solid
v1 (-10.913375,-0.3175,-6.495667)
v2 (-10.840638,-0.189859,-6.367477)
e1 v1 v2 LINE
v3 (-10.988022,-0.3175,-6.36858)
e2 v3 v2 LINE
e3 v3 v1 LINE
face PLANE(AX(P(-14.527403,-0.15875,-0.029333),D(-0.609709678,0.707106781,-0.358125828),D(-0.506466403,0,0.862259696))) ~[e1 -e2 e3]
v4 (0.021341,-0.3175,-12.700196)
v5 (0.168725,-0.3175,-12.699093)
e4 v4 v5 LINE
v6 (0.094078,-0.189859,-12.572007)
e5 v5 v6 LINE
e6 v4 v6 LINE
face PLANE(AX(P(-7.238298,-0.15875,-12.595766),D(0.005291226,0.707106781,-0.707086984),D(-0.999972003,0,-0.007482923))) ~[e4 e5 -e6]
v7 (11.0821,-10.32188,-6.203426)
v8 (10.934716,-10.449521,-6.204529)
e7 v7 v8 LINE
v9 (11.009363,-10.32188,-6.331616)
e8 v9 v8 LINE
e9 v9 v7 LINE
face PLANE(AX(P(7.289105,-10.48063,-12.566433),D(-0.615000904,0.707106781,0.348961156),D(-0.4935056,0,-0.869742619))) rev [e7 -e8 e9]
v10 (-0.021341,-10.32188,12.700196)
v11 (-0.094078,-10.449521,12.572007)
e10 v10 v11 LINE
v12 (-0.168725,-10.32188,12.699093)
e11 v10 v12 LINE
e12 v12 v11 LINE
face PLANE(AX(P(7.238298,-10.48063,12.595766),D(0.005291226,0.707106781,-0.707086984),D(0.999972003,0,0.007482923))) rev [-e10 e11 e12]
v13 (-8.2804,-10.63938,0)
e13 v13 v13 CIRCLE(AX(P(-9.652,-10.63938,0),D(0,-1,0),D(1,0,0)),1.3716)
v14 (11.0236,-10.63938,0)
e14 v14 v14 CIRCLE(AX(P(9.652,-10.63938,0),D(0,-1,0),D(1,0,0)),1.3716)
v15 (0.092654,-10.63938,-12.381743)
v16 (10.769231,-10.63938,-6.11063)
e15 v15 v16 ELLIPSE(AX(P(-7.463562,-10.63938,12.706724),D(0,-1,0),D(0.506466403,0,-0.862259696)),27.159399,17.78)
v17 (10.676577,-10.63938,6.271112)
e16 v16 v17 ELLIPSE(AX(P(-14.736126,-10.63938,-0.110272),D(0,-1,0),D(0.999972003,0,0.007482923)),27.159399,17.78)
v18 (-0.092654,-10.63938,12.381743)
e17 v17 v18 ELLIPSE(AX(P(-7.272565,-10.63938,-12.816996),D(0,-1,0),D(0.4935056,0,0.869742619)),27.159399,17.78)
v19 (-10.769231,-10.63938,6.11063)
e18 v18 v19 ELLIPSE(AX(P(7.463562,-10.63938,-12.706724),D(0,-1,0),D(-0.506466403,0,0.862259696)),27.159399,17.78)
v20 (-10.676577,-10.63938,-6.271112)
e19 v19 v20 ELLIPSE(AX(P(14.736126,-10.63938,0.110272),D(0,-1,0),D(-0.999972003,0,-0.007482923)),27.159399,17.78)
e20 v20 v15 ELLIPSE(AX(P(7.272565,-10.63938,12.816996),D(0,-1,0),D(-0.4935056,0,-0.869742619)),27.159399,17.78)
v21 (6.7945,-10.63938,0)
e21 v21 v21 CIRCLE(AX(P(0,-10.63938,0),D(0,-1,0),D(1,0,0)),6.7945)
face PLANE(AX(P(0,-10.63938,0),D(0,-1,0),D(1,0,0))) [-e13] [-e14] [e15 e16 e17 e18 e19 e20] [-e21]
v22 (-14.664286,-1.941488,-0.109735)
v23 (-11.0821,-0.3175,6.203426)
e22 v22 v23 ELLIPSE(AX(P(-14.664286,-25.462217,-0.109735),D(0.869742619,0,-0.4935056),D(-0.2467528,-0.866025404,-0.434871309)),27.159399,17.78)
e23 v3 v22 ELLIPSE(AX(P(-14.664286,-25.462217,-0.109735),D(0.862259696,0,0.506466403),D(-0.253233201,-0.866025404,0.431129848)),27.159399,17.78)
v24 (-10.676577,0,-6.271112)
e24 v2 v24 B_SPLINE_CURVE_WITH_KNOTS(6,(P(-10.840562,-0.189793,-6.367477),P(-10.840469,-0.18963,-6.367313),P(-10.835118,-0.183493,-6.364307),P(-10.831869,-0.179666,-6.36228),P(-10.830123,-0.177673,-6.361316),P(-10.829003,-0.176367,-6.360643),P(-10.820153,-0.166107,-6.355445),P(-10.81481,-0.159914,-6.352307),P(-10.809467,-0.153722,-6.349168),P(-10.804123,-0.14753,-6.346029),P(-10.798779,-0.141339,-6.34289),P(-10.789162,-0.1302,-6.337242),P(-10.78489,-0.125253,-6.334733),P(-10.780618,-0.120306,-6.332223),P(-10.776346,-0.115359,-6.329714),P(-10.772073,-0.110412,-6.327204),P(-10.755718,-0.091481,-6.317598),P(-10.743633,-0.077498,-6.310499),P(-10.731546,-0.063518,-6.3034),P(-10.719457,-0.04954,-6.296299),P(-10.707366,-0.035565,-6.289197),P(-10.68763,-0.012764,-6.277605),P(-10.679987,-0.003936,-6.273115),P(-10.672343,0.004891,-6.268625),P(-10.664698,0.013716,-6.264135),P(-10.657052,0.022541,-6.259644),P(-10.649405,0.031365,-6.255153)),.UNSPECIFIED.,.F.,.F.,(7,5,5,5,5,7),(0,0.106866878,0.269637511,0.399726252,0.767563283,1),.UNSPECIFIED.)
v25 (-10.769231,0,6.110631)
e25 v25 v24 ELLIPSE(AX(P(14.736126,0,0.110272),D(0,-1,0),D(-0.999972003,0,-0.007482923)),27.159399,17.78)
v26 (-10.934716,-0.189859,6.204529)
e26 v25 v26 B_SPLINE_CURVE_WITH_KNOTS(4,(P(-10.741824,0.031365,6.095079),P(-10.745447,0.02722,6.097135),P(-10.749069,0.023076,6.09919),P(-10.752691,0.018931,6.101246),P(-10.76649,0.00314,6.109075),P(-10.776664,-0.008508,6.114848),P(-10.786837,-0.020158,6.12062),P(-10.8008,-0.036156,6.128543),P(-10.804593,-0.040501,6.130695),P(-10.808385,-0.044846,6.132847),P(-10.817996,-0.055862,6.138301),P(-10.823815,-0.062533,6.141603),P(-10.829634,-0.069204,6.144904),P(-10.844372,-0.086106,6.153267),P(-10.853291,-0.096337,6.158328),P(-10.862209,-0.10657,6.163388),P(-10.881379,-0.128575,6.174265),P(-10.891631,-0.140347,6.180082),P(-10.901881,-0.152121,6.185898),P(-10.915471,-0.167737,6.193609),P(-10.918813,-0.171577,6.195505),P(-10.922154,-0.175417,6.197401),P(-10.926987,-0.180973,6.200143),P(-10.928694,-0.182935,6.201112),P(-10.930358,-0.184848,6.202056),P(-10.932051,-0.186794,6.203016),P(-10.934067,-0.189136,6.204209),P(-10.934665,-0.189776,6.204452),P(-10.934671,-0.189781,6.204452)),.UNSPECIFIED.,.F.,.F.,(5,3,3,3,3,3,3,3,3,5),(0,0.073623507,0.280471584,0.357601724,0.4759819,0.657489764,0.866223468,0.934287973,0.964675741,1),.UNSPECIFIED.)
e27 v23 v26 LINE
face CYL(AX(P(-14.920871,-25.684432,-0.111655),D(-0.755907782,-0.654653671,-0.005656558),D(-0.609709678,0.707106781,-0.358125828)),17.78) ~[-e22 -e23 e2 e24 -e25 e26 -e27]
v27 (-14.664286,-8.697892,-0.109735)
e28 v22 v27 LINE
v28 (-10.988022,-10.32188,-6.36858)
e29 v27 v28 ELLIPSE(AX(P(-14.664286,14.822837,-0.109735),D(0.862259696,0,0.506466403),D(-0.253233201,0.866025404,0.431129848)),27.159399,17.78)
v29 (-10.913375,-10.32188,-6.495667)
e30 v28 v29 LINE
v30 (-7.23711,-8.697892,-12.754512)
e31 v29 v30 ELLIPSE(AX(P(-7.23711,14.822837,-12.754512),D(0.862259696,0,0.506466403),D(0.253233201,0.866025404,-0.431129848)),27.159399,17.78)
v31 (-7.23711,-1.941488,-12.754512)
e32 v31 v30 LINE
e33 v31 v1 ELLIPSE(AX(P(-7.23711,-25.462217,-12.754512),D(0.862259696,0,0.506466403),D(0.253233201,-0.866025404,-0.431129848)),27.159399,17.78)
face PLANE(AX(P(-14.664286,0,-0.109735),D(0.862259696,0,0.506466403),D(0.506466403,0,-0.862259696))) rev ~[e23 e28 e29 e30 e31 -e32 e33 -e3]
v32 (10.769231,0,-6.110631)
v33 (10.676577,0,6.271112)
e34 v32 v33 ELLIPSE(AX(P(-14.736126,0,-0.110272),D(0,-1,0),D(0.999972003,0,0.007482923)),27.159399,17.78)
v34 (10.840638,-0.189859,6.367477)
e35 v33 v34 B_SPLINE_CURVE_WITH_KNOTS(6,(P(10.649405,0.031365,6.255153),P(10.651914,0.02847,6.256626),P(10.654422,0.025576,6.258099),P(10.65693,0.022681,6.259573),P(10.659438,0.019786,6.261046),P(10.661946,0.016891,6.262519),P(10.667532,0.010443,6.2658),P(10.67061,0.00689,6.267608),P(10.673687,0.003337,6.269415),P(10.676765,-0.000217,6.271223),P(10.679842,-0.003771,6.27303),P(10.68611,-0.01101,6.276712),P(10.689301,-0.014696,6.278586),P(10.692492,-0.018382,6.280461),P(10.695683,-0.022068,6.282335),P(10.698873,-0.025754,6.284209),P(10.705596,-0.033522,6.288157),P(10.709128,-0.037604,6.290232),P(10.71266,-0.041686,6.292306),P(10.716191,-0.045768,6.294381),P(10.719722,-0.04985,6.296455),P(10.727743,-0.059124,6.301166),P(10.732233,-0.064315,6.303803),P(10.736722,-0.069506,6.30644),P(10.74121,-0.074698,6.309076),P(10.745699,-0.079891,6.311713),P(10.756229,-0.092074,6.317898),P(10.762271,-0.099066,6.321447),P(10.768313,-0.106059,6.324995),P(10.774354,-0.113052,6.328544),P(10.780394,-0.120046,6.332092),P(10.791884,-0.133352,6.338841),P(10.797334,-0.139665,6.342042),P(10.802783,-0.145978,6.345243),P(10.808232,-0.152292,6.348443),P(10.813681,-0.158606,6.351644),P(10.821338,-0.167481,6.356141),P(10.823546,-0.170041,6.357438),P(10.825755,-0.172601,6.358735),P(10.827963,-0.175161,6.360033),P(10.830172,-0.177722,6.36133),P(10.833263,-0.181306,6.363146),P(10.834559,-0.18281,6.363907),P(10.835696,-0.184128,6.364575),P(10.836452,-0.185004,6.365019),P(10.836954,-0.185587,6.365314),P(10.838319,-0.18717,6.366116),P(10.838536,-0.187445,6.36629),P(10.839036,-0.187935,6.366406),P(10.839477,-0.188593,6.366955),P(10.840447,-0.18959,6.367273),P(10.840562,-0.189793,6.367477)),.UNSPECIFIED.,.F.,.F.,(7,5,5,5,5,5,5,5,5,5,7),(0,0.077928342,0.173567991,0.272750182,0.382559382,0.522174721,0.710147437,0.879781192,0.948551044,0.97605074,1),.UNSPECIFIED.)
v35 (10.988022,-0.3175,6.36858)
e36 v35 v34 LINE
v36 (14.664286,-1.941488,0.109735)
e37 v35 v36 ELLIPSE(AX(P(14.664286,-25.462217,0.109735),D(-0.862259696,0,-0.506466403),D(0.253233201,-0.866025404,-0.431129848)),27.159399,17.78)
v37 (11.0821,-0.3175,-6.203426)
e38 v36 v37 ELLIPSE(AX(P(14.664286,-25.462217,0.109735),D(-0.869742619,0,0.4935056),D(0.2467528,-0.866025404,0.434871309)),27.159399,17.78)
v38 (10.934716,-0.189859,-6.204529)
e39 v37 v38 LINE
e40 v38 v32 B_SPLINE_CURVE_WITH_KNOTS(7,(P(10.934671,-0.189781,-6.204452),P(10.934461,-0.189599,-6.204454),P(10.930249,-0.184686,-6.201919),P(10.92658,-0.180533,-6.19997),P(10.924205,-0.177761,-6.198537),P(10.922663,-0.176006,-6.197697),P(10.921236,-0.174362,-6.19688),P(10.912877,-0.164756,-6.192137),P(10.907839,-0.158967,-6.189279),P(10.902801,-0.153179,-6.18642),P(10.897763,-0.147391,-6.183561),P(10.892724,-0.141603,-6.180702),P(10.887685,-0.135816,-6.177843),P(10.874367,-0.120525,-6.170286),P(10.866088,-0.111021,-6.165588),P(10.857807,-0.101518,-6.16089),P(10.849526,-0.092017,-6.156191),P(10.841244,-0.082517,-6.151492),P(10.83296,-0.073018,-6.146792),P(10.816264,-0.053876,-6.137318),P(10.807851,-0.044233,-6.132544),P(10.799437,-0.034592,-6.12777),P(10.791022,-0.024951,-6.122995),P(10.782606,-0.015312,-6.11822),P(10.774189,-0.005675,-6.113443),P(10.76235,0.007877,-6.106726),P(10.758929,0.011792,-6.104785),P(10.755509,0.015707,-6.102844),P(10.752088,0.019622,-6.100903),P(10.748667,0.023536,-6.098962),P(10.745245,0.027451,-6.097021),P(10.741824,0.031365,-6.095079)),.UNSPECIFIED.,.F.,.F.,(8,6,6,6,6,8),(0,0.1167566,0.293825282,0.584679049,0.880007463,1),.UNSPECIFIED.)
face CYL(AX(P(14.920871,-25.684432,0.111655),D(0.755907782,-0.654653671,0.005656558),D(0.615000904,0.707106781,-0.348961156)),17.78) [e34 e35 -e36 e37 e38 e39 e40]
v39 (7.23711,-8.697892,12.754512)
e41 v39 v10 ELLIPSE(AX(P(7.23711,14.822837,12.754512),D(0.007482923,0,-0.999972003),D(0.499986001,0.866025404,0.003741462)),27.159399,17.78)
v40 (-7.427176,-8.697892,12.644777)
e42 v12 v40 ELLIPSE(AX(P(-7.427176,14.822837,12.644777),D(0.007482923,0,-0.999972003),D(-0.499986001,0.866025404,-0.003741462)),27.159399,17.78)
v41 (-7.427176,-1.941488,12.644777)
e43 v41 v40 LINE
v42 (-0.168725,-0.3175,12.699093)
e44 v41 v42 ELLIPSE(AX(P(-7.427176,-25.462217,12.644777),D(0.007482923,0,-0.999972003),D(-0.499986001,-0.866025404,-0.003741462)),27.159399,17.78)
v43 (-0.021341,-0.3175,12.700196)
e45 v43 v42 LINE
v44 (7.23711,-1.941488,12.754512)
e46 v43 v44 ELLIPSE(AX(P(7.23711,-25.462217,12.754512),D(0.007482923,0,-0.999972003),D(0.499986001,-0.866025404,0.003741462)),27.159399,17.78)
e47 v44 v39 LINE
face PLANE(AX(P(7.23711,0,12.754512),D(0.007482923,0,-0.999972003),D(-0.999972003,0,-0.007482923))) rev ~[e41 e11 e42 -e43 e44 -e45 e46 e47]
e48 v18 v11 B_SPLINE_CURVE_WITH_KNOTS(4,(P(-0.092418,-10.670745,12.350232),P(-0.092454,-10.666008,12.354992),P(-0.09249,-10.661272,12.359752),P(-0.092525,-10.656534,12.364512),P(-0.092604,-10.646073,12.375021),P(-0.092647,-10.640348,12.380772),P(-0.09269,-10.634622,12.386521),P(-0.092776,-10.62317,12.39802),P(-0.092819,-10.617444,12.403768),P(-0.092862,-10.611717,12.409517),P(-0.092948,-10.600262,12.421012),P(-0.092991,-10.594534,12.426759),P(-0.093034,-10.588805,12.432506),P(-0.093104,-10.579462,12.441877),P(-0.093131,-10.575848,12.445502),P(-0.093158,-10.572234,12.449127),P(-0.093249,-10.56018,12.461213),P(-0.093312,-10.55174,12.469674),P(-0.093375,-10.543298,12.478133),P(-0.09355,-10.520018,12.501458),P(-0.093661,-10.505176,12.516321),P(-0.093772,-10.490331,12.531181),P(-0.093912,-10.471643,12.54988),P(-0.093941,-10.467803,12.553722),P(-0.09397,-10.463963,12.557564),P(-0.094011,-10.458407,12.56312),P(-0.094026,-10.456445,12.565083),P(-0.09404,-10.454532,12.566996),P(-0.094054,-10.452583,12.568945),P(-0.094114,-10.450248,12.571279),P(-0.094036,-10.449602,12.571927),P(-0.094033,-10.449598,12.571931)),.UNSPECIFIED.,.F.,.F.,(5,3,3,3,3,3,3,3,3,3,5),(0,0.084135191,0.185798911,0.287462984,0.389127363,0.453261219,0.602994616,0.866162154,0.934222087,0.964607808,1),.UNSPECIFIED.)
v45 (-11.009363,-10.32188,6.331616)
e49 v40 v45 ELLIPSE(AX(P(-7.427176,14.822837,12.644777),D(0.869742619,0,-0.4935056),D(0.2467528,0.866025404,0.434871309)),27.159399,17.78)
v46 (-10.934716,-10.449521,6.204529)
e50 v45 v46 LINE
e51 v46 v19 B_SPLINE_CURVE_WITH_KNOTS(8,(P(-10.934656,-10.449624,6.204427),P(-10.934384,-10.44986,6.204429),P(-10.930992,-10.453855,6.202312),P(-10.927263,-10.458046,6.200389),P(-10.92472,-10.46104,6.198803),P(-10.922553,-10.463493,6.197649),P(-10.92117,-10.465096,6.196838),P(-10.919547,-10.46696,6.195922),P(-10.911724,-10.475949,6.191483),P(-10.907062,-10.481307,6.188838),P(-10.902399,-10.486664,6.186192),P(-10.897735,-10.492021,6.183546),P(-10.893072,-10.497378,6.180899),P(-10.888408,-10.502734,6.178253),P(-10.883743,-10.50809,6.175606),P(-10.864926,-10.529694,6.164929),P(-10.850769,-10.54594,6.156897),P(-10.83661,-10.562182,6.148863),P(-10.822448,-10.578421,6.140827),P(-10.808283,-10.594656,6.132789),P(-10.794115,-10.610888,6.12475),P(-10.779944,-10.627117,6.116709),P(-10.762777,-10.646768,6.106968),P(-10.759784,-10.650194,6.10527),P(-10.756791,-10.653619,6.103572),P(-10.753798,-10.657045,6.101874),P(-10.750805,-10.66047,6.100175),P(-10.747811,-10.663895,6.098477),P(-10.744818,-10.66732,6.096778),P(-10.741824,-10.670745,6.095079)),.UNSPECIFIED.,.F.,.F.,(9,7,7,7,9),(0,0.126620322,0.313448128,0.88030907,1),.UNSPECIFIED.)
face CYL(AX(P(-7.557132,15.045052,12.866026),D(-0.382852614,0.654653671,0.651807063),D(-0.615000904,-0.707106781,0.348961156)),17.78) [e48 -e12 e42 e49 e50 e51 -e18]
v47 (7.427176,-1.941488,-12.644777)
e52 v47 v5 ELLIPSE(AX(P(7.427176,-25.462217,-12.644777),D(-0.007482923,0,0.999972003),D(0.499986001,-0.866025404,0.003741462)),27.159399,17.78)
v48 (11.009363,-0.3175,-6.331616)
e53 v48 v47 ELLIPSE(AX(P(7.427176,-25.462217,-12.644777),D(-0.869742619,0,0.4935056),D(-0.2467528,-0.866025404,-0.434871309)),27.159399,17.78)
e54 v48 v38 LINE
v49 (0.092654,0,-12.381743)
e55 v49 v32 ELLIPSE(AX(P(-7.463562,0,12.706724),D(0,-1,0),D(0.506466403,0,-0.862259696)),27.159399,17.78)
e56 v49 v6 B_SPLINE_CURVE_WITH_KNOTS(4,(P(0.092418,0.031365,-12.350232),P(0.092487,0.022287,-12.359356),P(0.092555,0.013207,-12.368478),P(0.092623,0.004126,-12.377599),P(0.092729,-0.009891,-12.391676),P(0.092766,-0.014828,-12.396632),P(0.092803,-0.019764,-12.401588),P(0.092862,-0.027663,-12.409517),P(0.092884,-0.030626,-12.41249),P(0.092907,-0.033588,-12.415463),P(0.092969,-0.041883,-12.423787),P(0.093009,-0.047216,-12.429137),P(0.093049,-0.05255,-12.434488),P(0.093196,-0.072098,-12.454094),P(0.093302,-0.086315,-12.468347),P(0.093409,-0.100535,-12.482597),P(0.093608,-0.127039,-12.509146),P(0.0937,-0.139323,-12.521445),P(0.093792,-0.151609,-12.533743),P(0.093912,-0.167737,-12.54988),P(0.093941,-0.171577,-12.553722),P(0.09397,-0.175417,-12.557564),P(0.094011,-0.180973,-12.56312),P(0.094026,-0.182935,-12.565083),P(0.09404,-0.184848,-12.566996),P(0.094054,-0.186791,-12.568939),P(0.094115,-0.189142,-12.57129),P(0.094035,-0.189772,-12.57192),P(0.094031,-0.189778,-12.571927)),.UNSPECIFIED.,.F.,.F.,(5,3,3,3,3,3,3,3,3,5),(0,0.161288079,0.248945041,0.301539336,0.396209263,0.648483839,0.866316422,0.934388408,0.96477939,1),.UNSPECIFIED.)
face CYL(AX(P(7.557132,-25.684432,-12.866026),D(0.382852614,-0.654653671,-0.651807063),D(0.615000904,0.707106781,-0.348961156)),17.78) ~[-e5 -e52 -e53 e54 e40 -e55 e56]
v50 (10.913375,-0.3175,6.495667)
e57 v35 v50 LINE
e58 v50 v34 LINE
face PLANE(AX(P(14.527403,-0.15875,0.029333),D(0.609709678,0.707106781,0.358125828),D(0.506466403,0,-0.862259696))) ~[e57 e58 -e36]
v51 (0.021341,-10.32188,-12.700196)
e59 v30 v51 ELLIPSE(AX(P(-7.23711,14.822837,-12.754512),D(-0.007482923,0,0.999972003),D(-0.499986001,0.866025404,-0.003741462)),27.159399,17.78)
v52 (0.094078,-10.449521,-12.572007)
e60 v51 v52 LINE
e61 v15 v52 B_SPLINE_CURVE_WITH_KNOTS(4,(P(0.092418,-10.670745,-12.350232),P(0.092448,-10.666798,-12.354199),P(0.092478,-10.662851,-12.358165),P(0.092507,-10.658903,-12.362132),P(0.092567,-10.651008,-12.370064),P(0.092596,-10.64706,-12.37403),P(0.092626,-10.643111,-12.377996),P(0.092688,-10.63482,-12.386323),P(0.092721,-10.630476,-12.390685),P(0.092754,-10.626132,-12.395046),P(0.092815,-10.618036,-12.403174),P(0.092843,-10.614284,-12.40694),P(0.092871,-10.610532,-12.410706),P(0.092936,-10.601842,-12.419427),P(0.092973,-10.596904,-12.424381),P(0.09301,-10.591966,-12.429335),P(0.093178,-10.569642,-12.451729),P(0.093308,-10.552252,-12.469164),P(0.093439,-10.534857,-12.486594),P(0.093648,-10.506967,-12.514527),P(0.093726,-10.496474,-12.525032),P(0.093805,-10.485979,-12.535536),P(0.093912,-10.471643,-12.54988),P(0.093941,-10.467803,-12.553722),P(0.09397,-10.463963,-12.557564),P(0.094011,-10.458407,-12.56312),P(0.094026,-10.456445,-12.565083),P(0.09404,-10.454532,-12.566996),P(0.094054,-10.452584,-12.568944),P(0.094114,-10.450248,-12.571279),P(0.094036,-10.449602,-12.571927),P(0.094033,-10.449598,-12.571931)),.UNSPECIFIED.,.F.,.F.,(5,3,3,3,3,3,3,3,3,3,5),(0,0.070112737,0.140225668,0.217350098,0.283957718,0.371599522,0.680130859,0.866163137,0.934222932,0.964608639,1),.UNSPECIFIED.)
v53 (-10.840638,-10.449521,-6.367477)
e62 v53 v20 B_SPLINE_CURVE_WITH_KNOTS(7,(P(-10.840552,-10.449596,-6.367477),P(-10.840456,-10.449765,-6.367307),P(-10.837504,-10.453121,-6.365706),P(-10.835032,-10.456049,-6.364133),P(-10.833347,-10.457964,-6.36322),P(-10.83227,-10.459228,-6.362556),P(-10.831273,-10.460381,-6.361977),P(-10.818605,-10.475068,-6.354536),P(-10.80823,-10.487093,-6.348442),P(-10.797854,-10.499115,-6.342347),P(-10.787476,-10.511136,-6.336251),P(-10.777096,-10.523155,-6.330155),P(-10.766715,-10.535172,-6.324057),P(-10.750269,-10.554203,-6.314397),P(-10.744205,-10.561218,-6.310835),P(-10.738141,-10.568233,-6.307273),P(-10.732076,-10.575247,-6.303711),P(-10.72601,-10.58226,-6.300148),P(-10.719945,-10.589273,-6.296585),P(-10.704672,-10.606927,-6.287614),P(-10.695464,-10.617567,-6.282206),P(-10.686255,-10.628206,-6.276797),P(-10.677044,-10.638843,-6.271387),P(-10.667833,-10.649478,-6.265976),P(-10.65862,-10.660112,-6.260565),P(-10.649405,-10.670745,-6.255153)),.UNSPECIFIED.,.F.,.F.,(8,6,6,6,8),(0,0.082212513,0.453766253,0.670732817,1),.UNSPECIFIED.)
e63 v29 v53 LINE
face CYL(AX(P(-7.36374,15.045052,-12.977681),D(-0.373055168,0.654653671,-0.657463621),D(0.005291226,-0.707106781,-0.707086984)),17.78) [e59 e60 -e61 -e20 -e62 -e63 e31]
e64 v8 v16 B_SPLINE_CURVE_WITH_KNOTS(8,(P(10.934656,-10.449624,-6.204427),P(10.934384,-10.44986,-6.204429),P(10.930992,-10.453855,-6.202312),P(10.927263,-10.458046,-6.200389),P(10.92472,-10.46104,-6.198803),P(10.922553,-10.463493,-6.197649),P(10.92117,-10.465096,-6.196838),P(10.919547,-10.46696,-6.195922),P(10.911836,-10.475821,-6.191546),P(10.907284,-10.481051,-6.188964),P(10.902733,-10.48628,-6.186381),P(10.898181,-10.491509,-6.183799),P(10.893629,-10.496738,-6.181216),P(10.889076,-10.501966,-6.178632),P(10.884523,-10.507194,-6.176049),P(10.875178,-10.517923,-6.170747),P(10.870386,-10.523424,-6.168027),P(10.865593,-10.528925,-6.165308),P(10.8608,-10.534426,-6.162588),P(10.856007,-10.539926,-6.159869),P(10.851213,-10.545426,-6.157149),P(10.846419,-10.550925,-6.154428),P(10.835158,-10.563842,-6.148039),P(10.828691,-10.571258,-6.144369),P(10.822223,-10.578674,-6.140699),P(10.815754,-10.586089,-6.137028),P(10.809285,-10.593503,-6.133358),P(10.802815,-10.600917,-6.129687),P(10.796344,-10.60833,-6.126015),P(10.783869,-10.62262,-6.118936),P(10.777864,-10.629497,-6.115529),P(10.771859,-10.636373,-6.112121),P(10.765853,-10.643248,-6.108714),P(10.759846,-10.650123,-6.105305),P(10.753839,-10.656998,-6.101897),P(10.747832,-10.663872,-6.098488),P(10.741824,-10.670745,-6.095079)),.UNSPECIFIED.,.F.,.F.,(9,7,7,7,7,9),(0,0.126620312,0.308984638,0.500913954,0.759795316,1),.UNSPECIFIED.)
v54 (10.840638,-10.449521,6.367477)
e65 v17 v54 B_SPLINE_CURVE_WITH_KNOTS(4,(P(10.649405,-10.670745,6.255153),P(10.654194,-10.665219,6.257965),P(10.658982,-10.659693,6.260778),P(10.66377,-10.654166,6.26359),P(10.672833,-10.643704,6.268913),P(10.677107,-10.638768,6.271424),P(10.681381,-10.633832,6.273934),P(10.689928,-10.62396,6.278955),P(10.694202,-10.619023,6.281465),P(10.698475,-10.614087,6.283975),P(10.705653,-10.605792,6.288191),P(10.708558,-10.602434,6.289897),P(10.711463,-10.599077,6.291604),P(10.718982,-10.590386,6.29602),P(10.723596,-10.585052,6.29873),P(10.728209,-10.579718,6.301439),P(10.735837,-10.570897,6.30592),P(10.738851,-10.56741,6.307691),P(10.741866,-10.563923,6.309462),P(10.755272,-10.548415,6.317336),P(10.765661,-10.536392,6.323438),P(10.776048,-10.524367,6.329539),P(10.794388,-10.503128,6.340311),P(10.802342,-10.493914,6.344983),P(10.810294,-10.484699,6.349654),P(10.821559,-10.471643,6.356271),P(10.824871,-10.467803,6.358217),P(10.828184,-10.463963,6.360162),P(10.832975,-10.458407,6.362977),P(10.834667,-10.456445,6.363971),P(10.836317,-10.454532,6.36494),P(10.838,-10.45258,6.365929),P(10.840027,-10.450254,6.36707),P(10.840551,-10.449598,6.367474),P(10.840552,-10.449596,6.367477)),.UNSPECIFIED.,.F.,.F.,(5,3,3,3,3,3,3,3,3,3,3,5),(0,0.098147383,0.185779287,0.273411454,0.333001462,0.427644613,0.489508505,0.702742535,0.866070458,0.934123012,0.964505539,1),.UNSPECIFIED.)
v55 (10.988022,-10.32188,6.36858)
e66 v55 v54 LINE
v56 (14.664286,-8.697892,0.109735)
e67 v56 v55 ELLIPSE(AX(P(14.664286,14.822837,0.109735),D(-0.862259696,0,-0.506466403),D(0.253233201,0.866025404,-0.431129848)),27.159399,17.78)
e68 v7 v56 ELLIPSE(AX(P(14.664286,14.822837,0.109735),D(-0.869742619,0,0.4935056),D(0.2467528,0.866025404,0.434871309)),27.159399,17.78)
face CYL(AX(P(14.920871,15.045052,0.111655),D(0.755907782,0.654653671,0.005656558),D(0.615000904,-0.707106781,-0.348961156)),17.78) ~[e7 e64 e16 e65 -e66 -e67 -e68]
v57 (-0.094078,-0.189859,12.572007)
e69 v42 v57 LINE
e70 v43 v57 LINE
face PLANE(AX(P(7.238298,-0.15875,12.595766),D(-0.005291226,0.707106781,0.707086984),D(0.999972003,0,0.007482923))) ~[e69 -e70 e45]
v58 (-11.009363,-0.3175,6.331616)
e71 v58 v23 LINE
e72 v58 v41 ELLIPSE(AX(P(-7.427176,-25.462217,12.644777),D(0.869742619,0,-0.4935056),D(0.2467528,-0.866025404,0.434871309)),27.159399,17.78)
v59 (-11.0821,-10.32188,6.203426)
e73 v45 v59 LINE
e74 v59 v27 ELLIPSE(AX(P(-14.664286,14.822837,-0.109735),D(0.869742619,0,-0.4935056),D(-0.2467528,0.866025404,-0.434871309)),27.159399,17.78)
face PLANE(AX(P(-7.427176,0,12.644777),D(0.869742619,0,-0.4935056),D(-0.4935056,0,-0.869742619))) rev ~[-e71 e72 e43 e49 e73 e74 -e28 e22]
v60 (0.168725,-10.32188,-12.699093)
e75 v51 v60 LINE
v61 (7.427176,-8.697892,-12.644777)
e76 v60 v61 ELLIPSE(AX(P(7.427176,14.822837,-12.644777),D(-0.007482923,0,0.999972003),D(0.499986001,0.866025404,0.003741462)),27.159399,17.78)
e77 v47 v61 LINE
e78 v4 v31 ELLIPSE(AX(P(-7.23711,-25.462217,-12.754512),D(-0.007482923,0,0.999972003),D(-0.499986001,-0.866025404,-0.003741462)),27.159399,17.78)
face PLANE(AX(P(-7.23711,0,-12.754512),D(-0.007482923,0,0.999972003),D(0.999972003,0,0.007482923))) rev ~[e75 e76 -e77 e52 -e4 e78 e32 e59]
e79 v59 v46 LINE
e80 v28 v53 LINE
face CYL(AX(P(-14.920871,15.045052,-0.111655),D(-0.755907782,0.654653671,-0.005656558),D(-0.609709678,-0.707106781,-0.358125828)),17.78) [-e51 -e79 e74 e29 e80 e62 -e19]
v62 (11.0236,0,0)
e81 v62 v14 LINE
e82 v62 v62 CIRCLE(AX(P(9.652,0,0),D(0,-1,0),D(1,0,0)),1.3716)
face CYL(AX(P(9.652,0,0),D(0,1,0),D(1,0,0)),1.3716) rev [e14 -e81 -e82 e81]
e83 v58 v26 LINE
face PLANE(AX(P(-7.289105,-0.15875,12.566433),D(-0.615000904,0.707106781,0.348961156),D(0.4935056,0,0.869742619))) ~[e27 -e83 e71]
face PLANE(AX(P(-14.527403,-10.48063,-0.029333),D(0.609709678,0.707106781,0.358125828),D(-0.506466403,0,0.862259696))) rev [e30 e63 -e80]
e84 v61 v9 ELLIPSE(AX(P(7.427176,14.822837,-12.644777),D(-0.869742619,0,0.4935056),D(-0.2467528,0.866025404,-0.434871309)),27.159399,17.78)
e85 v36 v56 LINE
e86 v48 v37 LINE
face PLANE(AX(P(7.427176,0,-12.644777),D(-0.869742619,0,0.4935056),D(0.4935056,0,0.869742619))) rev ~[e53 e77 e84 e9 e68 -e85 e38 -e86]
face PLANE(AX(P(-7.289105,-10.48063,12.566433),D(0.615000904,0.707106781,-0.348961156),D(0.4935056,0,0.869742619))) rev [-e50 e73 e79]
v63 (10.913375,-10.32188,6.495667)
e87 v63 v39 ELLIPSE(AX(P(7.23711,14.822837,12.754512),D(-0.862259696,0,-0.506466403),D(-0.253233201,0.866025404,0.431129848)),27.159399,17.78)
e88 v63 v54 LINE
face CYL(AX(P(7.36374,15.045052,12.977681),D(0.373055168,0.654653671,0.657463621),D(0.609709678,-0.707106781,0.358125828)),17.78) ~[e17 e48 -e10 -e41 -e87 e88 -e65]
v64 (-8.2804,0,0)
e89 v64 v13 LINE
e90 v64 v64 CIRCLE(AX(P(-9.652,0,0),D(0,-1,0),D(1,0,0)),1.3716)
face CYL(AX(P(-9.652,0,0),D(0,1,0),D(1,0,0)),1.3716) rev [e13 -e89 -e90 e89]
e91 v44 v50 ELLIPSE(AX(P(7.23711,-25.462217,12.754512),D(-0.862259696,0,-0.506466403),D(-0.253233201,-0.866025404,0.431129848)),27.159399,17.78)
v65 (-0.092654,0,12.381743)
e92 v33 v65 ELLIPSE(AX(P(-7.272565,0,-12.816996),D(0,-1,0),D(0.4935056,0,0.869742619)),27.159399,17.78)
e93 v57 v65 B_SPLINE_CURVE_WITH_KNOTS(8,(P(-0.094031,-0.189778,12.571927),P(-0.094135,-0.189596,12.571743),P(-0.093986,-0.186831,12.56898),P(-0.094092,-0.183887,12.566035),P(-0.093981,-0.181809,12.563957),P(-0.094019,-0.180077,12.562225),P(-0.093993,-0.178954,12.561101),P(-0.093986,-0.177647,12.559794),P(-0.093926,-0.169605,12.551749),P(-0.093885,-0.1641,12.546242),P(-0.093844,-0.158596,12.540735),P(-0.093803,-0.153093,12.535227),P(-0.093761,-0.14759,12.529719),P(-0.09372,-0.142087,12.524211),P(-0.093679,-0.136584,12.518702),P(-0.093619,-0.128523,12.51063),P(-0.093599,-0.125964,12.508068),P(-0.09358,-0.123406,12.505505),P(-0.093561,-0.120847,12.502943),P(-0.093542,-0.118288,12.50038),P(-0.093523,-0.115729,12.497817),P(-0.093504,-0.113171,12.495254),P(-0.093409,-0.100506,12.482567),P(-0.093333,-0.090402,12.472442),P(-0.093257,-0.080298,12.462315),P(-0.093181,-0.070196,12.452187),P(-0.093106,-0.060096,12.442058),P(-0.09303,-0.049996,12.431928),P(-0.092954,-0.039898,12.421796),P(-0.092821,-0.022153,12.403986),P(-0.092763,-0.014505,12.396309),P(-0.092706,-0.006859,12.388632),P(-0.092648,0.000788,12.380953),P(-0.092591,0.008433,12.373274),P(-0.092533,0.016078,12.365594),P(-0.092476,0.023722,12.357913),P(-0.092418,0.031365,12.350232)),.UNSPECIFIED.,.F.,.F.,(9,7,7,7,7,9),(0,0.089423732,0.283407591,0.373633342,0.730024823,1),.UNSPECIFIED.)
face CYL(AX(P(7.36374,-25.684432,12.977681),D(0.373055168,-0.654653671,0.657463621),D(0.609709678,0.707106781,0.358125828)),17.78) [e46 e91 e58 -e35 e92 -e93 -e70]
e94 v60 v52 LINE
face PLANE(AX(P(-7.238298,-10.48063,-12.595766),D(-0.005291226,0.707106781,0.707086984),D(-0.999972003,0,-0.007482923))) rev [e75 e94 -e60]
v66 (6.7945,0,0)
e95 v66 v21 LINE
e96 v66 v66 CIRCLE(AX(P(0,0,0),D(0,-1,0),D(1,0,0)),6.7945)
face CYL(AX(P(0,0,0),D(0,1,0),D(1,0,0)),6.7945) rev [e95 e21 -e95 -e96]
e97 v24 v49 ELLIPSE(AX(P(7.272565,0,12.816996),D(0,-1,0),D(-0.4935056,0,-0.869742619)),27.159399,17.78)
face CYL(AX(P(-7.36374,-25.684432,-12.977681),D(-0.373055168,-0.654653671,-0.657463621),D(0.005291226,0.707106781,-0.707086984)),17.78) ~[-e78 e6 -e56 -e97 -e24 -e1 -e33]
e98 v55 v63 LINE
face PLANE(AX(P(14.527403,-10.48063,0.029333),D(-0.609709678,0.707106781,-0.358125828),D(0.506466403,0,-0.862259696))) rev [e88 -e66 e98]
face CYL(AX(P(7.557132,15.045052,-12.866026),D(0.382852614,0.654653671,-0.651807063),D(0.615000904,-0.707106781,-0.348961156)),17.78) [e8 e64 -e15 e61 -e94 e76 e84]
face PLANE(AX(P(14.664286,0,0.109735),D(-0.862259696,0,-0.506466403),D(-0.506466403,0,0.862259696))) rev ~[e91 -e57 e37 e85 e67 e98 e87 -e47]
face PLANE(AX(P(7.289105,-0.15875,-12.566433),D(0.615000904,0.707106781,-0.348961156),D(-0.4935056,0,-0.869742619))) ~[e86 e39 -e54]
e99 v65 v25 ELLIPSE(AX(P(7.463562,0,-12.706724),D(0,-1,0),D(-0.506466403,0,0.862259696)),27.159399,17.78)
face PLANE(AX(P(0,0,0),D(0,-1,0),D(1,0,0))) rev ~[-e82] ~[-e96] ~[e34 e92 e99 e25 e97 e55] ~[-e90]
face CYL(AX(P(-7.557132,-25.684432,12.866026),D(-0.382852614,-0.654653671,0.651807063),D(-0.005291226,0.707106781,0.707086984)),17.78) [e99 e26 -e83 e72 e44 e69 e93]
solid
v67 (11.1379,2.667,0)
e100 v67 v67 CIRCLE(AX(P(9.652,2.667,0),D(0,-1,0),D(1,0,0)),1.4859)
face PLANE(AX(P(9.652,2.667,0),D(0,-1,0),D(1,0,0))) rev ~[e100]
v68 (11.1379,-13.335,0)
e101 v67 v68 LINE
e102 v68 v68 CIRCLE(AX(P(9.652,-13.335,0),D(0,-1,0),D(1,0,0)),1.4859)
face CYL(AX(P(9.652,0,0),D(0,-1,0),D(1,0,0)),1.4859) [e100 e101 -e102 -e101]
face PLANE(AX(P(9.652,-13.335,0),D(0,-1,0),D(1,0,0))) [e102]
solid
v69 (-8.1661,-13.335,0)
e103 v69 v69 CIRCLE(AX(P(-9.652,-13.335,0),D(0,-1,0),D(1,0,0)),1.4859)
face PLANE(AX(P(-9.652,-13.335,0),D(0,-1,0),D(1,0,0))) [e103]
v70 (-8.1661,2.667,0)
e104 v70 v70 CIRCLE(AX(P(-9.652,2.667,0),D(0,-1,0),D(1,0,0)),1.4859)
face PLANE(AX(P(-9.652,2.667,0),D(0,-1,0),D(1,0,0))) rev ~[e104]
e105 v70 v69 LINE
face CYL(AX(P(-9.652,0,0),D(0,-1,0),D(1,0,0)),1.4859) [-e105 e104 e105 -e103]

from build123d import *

# Parameters (mm, degrees)
F0_R          = 1.3716
F0_R_2        = 6.7945
F1_DEPTH      = 10.63938
F2_R          = 1.4859
F3_DEPTH      = 13.335
F3_DEPTH_BACK = 2.667
F4_SIZE2      = 0.3175
F4_SIZE       = 0.3175
F5_T1_DEPTH   = 34.0860309116
F5_T3_DEPTH   = 34.0860309116
F5_T5_DEPTH   = 34.0860309116
F5_T7_DEPTH   = 34.0860309116
F5_T9_DEPTH   = 34.0860309116
F5_T11_DEPTH  = 34.0860309116
F5_T13_DEPTH  = 34.0860309116
F5_T15_DEPTH  = 34.0860309116
F5_T17_DEPTH  = 34.0860309116
F5_T19_DEPTH  = 34.0860309116
F5_T21_DEPTH  = 34.0860309116
F5_T23_DEPTH  = 34.0860309116


# Not quite as in the source:
# - a fillet or chamfer that OpenCascade refuses, or shapes differently, is made with other operations: its cross-section is extruded or revolved along the edge and cut away or added


with BuildPart() as f1:
    # F0 (on Front) → F1 (new body)
    with BuildSketch(Plane.XZ):
        Polygon((7.427176254, -12.6447770335), (14.6642862631, 0.1097347976), (7.2371100092, 12.754511831), (-7.427176254, 12.6447770335), (-14.6642862631, -0.1097347976), (-7.2371100092, -12.754511831), align=None)
        with Locations((-9.652, 0)):
            Circle(F0_R, mode=Mode.SUBTRACT)
        Circle(F0_R_2, mode=Mode.SUBTRACT)
        with Locations((9.652, 0)):
            Circle(F0_R, mode=Mode.SUBTRACT)
    extrude(amount=F1_DEPTH)

    # F4
    f4_edges = [f1.edges().sort_by_distance(p)[0] for p in [
        (-11.045731, -10.63938, 6.267521),
        (-0.095033, -10.63938, 12.699644),
        (-10.950698, -10.63938, -6.432123),
        (0.095033, -10.63938, -12.699644),
        (11.045731, -10.63938, -6.267521),
        (10.950698, -10.63938, 6.432123),
        (-0.095033, 0, 12.699644),
        (10.950698, 0, 6.432123),
        (11.045731, 0, -6.267521),
        (0.095033, 0, -12.699644),
        (-10.950698, 0, -6.432123),
        (-11.045731, 0, 6.267521),
    ]]
    chamfer(f4_edges, length=F4_SIZE, length2=F4_SIZE2)

    # F5: fillet of radius 17.78 on 12 edges, made by hand

    # F5_s2 → F5_t1 (cut)
    with BuildSketch(Plane(origin=(21.2363539354, -18.3917369138, 0.158914451), x_dir=(-0.6546641443, -0.7559198755, 0), z_dir=(-0.7559077819, 0.6546536707, -0.0056565581))):
        with BuildLine():
            ThreePointArc((-7.0150486709, -6.2518889722), (-8.1325730637, 0.0398403383), (-6.9534591831, 6.3203187391))
            Line((-6.9534591831, 6.3203187391), (-9.3601778581, 0.0458542026))
            Line((-9.3601778581, 0.0458542026), (-7.0150486709, -6.2518889722))
        make_face()
    extrude(amount=F5_T1_DEPTH, mode=Mode.SUBTRACT)

    # F5_s4 → F5_t3 (cut)
    with BuildSketch(Plane(origin=(10.7558009193, -18.3917369138, -18.3117647664), x_dir=(-0.8632209447, -0.5048263073, 0), z_dir=(-0.382852614, 0.6546536707, 0.651807063))):
        with BuildLine():
            ThreePointArc((-9.343230333, -1.0005351171), (-5.4311798933, -6.0533145347), (0.0146355079, -9.3966381955))
            Line((0.0146355079, -9.3966381955), (-6.2510117502, -6.9670570718))
            Line((-6.2510117502, -6.9670570718), (-9.343230333, -1.0005351171))
        make_face()
    extrude(amount=F5_T3_DEPTH, mode=Mode.SUBTRACT)

    # F5_s6 → F5_t5 (cut)
    with BuildSketch(Plane(origin=(-10.4805530161, -18.3917369138, -18.4706792173), x_dir=(-0.8688328915, 0.49510545, 0), z_dir=(0.3730551679, 0.6546536707, 0.6574636211))):
        with BuildLine():
            ThreePointArc((-0.1757380658, -9.3950061047), (5.3265979335, -6.1455419894), (9.324702912, -1.1605770882))
            Line((9.324702912, -1.1605770882), (6.130643235, -7.0732061802))
            Line((6.130643235, -7.0732061802), (-0.1757380658, -9.3950061047))
        make_face()
    extrude(amount=F5_T5_DEPTH, mode=Mode.SUBTRACT)

    # F5_s8 → F5_t7 (cut)
    with BuildSketch(Plane(origin=(-21.2363539354, -18.3917369138, -0.158914451), x_dir=(-0.6546641443, 0.7559198755, 0), z_dir=(0.7559077819, 0.6546536707, 0.0056565581))):
        with BuildLine():
            ThreePointArc((6.9534591831, -6.3203187391), (8.1325730637, -0.0398403383), (7.0150486709, 6.2518889722))
            Line((7.0150486709, 6.2518889722), (9.3601778581, -0.0458542026))
            Line((9.3601778581, -0.0458542026), (6.9534591831, -6.3203187391))
        make_face()
    extrude(amount=F5_T7_DEPTH, mode=Mode.SUBTRACT)

    # F5_s10 → F5_t9 (cut)
    with BuildSketch(Plane(origin=(-10.7558009193, -18.3917369138, 18.3117647664), x_dir=(-0.8632209447, 0.5048263073, 0), z_dir=(0.382852614, 0.6546536707, -0.651807063))):
        with BuildLine():
            ThreePointArc((-0.0146355079, 9.3966381955), (5.4311798933, 6.0533145347), (9.343230333, 1.0005351171))
            Line((9.343230333, 1.0005351171), (6.2510117502, 6.9670570718))
            Line((6.2510117502, 6.9670570718), (-0.0146355079, 9.3966381955))
        make_face()
    extrude(amount=F5_T9_DEPTH, mode=Mode.SUBTRACT)

    # F5_s12 → F5_t11 (cut)
    with BuildSketch(Plane(origin=(10.4805530161, -18.3917369138, 18.4706792173), x_dir=(-0.8688328915, -0.49510545, 0), z_dir=(-0.3730551679, 0.6546536707, -0.6574636211))):
        with BuildLine():
            ThreePointArc((-9.324702912, 1.1605770882), (-5.3265979335, 6.1455419894), (0.1757380658, 9.3950061047))
            Line((0.1757380658, 9.3950061047), (-6.130643235, 7.0732061802))
            Line((-6.130643235, 7.0732061802), (-9.324702912, 1.1605770882))
        make_face()
    extrude(amount=F5_T11_DEPTH, mode=Mode.SUBTRACT)

    # F5_s14 → F5_t13 (cut)
    with BuildSketch(Plane(origin=(-15.9713737111, 13.8320026281, -0.1195159062), x_dir=(0.6546641443, 0.7559198755, 0), z_dir=(0.7559077819, -0.6546536707, 0.0056565581))):
        with BuildLine():
            ThreePointArc((-14.9959779879, -6.3597179142), (-16.1750918685, -0.0792395135), (-15.0575674756, 6.2124897971))
            Line((-15.0575674756, 6.2124897971), (-17.4026966628, -0.0852533777))
            Line((-17.4026966628, -0.0852533777), (-14.9959779879, -6.3597179142))
        make_face()
    extrude(amount=F5_T13_DEPTH, mode=Mode.SUBTRACT)

    # F5_s16 → F5_t15 (cut)
    with BuildSketch(Plane(origin=(-7.8821830446, 13.8320026281, -13.8913733202), x_dir=(0.8688328915, 0.49510545, 0), z_dir=(0.3730551679, -0.6546536707, 0.6574636211))):
        with BuildLine():
            ThreePointArc((-5.0918769572, -15.4724967867), (-10.5942129565, -12.2230326714), (-14.592317935, -7.2380677702))
            Line((-14.592317935, -7.2380677702), (-11.3982582579, -13.1506968622))
            Line((-11.3982582579, -13.1506968622), (-5.0918769572, -15.4724967867))
        make_face()
    extrude(amount=F5_T15_DEPTH, mode=Mode.SUBTRACT)

    # F5_s18 → F5_t17 (cut)
    with BuildSketch(Plane(origin=(-8.0891906664, 13.8320026281, 13.771857414), x_dir=(0.8632209447, 0.5048263073, 0), z_dir=(0.382852614, -0.6546536707, -0.651807063))):
        with BuildLine():
            ThreePointArc((-14.7142692504, 6.9868196047), (-10.8022188107, 12.0395990224), (-5.3564034095, 15.3829226832))
            Line((-5.3564034095, 15.3829226832), (-11.6220506676, 12.9533415595))
            Line((-11.6220506676, 12.9533415595), (-14.7142692504, 6.9868196047))
        make_face()
    extrude(amount=F5_T17_DEPTH, mode=Mode.SUBTRACT)

    # F5_s20 → F5_t19 (cut)
    with BuildSketch(Plane(origin=(7.8821830446, 13.8320026281, 13.8913733202), x_dir=(0.8688328915, -0.49510545, 0), z_dir=(-0.3730551679, -0.6546536707, -0.6574636211))):
        with BuildLine():
            ThreePointArc((14.592317935, 7.2380677702), (10.5942129565, 12.2230326714), (5.0918769572, 15.4724967867))
            Line((5.0918769572, 15.4724967867), (11.3982582579, 13.1506968622))
            Line((11.3982582579, 13.1506968622), (14.592317935, 7.2380677702))
        make_face()
    extrude(amount=F5_T19_DEPTH, mode=Mode.SUBTRACT)

    # F5_s22 → F5_t21 (cut)
    with BuildSketch(Plane(origin=(15.9713737111, 13.8320026281, 0.1195159062), x_dir=(0.6546641443, -0.7559198755, 0), z_dir=(-0.7559077819, -0.6546536707, -0.0056565581))):
        with BuildLine():
            ThreePointArc((15.0575674756, -6.2124897971), (16.1750918685, 0.0792395135), (14.9959779879, 6.3597179142))
            Line((14.9959779879, 6.3597179142), (17.4026966628, 0.0852533777))
            Line((17.4026966628, 0.0852533777), (15.0575674756, -6.2124897971))
        make_face()
    extrude(amount=F5_T21_DEPTH, mode=Mode.SUBTRACT)

    # F5_s24 → F5_t23 (cut)
    with BuildSketch(Plane(origin=(8.0891906664, 13.8320026281, -13.771857414), x_dir=(0.8632209447, -0.5048263073, 0), z_dir=(-0.382852614, -0.6546536707, 0.651807063))):
        with BuildLine():
            ThreePointArc((14.7142692504, -6.9868196047), (10.8022188107, -12.0395990224), (5.3564034095, -15.3829226832))
            Line((5.3564034095, -15.3829226832), (11.6220506676, -12.9533415595))
            Line((11.6220506676, -12.9533415595), (14.7142692504, -6.9868196047))
        make_face()
    extrude(amount=F5_T23_DEPTH, mode=Mode.SUBTRACT)


with BuildPart() as f3:
    # F2 (on Front) → F3 (new body, two sides)
    with BuildSketch(Plane.XZ) as f3_sk:
        with Locations((9.652, 0)):
            Circle(F2_R)
    extrude(amount=F3_DEPTH)
    extrude(f3_sk.sketch, amount=-F3_DEPTH_BACK)


with BuildPart() as f3b:
    # F2 (on Front) → F3, piece 2 (new body, two sides)
    with BuildSketch(Plane.XZ) as f3_2_sk:
        with Locations((-9.652, 0)):
            Circle(F2_R)
    extrude(amount=F3_DEPTH)
    extrude(f3_2_sk.sketch, amount=-F3_DEPTH_BACK)


solid = Compound([f1.part, f3.part, f3b.part])
